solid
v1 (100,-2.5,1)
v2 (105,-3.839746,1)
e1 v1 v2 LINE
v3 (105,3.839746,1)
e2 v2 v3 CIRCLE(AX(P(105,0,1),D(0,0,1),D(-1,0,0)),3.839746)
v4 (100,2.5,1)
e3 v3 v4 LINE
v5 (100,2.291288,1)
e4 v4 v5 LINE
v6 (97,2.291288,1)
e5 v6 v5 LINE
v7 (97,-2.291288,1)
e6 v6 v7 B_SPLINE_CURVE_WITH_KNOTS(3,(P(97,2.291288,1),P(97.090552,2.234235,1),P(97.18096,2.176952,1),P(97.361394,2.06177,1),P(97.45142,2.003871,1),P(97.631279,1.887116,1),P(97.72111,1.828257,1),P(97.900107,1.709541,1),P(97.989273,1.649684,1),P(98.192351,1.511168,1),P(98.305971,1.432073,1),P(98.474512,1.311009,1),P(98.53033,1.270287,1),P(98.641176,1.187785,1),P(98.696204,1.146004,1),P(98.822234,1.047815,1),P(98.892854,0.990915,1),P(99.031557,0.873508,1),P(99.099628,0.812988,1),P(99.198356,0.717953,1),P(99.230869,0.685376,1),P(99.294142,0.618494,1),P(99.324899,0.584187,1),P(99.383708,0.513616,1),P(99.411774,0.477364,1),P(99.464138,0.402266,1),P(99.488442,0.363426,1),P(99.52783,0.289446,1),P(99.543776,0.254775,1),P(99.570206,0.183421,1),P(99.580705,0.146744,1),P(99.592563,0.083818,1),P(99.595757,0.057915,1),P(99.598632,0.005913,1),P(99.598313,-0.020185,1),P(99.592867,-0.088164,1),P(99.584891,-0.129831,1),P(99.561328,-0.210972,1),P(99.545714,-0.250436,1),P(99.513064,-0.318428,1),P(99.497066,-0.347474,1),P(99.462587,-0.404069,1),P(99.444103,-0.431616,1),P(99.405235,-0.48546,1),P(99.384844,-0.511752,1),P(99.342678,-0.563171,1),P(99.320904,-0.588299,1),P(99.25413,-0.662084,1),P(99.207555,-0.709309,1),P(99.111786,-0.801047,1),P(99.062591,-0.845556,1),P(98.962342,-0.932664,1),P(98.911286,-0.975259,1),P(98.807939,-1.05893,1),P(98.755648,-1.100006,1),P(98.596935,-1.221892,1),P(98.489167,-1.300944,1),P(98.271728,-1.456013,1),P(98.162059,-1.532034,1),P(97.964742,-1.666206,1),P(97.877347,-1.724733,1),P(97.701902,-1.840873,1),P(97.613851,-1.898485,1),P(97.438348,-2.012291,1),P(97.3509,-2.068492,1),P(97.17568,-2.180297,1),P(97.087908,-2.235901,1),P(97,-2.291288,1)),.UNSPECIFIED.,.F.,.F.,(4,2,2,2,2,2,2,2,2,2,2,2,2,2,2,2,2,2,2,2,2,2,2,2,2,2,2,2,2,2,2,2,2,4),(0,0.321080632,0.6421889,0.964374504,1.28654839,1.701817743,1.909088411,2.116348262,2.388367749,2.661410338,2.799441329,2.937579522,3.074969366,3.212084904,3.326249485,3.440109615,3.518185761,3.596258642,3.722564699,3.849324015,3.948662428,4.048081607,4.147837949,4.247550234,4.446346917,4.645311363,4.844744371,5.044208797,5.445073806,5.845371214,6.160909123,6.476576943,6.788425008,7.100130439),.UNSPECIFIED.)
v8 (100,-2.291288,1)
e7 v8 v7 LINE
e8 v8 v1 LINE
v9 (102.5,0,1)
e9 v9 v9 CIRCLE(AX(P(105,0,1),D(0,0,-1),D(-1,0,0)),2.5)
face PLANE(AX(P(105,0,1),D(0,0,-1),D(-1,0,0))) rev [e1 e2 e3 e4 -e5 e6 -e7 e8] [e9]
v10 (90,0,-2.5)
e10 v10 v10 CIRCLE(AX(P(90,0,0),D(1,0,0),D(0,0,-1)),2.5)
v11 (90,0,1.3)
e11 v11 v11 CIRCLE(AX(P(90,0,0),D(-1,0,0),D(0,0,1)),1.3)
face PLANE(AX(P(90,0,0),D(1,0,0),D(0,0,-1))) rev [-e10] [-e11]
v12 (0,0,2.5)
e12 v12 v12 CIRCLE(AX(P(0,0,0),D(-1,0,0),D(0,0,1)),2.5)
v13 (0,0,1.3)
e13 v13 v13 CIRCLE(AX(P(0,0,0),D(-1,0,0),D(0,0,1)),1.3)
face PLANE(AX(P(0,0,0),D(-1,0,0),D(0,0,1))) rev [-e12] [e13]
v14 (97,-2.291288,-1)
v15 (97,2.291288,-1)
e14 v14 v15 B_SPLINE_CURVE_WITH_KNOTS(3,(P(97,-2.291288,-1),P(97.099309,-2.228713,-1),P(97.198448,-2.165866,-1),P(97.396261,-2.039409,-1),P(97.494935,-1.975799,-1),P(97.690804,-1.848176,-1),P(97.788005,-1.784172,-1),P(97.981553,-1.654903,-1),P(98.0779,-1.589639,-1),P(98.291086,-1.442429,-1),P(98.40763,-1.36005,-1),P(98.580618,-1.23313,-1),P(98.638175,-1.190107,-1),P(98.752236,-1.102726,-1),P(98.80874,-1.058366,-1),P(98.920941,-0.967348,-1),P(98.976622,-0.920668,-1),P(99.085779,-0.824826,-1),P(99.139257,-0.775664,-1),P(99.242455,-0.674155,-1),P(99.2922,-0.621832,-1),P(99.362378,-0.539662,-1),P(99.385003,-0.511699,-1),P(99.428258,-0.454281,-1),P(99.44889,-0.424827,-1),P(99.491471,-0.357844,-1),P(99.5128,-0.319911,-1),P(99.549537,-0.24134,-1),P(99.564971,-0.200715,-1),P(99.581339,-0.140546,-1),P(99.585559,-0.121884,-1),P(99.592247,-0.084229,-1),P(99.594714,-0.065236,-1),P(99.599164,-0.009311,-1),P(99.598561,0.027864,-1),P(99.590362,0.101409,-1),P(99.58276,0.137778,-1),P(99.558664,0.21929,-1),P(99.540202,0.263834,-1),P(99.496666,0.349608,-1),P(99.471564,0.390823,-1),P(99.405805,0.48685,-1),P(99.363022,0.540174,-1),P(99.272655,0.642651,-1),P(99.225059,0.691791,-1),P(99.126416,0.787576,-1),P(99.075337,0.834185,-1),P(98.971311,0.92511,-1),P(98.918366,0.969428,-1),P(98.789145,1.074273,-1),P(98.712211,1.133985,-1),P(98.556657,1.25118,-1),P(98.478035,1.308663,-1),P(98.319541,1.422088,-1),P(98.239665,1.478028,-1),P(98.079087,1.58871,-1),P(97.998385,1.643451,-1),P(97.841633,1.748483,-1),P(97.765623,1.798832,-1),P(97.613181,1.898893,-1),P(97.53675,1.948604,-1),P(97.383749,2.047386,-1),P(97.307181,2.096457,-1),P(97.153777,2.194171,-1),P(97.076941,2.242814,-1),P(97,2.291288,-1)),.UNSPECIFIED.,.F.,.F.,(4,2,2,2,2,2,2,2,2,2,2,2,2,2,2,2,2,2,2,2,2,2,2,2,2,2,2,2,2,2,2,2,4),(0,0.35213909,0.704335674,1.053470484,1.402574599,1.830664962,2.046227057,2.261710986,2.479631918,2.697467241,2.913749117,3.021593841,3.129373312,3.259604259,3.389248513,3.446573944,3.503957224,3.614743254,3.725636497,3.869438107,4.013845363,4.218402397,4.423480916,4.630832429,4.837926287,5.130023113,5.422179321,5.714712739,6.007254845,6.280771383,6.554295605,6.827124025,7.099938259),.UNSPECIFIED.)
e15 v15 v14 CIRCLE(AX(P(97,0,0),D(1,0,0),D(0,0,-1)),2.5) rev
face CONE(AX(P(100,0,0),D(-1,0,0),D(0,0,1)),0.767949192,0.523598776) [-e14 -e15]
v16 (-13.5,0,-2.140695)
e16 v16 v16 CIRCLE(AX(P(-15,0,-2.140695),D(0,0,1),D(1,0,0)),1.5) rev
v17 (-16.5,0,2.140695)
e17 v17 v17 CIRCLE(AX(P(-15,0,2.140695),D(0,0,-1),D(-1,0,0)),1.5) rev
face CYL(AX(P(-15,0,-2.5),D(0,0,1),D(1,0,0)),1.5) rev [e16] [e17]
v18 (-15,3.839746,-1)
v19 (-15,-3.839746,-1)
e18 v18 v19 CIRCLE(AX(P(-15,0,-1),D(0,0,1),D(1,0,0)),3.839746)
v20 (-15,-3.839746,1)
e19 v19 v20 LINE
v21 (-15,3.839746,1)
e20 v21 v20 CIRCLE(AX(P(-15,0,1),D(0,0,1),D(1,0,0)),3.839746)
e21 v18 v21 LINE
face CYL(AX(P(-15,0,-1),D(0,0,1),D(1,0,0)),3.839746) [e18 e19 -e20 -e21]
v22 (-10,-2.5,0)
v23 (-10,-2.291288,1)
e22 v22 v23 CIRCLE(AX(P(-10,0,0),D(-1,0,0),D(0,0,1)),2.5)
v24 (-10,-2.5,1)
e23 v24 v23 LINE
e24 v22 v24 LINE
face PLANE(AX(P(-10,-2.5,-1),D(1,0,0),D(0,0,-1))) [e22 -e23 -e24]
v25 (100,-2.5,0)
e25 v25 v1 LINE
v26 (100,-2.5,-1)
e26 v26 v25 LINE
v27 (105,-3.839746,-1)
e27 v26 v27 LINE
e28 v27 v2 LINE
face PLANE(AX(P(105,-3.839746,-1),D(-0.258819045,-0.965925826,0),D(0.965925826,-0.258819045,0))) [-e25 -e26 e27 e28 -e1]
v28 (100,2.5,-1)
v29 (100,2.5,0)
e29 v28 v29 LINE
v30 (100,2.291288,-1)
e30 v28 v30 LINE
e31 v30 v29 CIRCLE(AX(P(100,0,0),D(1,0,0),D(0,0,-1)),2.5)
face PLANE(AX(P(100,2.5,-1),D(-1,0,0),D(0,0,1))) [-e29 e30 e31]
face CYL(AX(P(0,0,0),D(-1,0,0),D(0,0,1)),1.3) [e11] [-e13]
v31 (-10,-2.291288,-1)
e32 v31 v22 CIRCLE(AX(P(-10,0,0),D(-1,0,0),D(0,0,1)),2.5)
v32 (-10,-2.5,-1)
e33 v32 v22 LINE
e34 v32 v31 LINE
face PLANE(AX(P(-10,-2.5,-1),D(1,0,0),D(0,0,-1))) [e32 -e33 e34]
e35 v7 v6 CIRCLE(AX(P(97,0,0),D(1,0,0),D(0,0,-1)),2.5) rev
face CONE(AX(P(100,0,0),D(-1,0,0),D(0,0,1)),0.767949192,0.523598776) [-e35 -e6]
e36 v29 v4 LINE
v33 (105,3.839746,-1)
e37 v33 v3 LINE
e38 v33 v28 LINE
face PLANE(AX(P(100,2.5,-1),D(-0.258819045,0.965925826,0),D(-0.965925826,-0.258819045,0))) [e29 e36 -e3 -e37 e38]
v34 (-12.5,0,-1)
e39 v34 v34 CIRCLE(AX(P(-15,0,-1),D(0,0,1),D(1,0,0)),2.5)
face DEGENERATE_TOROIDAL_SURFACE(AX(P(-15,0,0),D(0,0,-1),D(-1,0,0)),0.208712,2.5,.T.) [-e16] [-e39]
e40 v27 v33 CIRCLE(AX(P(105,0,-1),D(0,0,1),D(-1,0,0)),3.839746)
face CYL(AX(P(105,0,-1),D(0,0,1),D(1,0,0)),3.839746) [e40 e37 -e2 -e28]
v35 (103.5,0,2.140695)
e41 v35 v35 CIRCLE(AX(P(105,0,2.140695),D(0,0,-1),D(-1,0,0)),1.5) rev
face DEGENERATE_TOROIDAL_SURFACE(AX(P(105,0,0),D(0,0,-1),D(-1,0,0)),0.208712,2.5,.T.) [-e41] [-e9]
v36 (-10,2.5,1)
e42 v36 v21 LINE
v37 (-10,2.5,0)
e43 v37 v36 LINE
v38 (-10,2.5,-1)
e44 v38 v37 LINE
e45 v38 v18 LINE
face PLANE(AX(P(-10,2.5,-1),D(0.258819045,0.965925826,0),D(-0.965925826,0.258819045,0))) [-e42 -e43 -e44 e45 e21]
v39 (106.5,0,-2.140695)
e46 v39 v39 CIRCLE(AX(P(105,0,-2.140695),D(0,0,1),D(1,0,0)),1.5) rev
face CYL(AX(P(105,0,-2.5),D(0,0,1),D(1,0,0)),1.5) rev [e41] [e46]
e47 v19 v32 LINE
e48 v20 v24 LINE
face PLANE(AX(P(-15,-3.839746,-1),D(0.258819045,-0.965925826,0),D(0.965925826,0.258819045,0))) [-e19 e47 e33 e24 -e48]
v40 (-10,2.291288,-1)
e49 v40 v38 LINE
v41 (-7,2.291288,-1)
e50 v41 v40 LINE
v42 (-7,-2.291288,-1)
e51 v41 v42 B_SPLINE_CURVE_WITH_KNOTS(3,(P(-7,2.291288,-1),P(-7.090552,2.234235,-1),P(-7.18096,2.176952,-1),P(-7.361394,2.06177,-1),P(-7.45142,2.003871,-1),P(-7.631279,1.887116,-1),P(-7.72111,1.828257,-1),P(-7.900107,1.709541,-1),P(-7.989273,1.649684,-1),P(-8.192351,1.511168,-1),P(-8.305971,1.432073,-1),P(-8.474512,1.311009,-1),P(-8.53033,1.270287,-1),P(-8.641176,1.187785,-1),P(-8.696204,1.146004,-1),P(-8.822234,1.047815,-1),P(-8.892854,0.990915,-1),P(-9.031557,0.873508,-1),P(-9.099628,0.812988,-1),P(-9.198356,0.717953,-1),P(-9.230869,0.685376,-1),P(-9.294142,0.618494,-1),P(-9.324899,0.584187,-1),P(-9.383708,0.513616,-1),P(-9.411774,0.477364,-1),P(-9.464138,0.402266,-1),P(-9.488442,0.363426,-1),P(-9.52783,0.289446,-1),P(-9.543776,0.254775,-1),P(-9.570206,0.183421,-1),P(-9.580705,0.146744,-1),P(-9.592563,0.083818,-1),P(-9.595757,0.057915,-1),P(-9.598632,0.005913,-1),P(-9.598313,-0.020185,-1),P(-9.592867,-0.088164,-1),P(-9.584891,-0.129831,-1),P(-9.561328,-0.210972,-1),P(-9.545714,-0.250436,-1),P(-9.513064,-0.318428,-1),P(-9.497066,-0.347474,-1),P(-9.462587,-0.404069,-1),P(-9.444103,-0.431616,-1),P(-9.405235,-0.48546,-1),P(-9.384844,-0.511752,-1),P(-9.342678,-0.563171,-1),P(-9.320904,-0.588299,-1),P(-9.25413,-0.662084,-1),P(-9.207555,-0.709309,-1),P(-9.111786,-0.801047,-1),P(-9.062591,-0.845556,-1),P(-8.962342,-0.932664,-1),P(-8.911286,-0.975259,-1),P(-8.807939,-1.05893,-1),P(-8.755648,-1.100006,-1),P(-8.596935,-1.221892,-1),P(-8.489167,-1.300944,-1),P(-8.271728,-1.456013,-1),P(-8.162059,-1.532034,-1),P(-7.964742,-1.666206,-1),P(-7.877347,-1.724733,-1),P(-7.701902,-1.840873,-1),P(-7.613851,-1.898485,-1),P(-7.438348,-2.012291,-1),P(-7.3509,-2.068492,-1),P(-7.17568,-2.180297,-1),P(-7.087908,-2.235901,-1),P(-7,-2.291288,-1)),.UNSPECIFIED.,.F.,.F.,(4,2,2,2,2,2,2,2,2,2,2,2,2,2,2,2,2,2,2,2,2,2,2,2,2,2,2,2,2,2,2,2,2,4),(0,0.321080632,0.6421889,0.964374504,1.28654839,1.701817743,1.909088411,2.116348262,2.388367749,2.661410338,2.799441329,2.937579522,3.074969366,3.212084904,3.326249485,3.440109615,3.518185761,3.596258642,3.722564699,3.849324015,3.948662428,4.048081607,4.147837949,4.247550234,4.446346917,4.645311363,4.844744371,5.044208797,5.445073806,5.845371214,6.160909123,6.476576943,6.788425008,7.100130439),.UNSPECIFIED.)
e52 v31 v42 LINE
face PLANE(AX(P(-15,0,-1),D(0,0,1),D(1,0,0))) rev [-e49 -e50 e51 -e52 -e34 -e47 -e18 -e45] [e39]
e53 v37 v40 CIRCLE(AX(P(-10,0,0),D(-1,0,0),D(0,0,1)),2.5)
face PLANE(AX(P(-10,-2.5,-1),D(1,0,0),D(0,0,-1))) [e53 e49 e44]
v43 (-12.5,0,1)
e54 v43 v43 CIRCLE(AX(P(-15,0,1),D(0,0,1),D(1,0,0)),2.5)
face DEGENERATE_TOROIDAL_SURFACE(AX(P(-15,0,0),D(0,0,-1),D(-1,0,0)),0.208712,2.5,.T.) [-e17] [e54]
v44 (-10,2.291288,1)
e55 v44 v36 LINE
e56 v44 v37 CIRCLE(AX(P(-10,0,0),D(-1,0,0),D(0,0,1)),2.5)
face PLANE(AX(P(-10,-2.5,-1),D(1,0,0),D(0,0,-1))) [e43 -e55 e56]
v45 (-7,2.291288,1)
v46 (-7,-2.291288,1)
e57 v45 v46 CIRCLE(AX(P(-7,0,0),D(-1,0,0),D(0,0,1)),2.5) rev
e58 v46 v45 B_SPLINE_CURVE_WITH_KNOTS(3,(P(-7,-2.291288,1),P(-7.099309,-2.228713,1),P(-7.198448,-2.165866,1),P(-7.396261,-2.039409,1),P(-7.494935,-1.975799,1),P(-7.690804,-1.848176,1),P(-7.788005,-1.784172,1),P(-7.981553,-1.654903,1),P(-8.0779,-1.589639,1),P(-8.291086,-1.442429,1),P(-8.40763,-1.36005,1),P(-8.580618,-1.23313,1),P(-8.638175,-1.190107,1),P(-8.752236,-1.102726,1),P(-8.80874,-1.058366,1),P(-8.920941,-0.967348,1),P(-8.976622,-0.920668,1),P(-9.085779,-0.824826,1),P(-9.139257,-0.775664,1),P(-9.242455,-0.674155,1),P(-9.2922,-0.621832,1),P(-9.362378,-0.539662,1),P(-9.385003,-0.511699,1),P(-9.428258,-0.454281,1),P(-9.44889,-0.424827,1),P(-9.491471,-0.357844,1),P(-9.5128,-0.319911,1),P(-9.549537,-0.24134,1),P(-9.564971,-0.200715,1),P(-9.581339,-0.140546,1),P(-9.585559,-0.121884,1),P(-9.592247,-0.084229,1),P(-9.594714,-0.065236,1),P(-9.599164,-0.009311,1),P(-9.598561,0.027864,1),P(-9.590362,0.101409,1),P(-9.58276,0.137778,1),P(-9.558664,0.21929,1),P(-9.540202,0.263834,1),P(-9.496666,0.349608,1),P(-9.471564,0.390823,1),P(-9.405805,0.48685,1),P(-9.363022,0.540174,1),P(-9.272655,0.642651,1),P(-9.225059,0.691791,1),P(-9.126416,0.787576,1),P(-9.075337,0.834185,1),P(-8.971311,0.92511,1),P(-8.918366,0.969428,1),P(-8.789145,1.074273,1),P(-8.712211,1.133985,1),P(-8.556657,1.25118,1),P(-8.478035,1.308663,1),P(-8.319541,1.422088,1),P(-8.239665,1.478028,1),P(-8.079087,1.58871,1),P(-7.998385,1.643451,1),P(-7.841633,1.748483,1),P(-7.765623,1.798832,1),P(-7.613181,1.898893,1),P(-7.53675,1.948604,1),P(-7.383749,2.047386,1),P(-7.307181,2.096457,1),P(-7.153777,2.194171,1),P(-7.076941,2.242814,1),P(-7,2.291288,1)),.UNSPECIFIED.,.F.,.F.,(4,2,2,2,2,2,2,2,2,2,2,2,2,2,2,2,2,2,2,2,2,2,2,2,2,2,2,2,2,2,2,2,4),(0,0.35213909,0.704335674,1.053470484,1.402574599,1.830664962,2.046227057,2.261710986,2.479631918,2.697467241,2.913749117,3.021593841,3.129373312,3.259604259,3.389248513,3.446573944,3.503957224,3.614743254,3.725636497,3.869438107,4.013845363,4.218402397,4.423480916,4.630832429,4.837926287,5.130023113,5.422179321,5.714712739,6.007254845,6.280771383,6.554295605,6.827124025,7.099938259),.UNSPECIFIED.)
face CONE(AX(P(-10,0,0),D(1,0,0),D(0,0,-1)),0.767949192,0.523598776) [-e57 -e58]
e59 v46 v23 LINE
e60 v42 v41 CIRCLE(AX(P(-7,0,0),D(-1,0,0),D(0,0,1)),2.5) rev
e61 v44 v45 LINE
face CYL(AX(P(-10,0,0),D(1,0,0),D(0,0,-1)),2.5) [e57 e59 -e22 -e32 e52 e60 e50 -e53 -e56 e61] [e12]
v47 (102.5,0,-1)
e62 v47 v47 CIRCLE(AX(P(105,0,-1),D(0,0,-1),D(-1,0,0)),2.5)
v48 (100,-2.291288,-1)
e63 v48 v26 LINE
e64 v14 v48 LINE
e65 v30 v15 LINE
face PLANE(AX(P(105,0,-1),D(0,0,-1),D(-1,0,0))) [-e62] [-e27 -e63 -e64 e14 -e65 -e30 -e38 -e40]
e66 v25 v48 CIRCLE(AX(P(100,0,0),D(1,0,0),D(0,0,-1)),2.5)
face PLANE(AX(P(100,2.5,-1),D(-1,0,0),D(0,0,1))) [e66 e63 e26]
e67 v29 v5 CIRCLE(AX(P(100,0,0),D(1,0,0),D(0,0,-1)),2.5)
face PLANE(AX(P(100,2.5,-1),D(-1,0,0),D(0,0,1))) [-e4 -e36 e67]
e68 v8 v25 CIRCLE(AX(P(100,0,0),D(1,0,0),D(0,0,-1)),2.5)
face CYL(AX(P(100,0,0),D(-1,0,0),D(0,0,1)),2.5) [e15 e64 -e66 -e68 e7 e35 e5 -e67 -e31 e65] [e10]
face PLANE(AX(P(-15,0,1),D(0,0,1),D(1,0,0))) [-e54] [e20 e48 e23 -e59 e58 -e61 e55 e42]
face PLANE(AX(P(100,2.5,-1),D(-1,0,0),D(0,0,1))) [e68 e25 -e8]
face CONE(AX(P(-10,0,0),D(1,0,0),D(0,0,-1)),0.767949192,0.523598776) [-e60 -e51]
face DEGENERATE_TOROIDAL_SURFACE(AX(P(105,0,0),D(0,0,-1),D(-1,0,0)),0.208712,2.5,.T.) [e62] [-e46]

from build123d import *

# Parameters (mm, degrees)
SKETCH_1_W               = 90
SKETCH_1_H               = 1.3
SKETCH_2_R               = 2.5
EXTRUDE_1_DEPTH          = 10
EXTRUDE_START            = 10
SKETCH_3_R               = 2.5
EXTRUDE_2_DEPTH          = 10
EXTRUDE_3_DEPTH          = 1
EXTRUDE_3_DEPTH_BACK     = 1
SKETCH_4_R               = 1.55
EXTRUDE_4_DEPTH          = 2.5
EXTRUDE_4_DEPTH_BACK     = 2.5
SKETCH_5_R               = 2.5
CHAMFER_1_SIZE           = 3
CHAMFER_1_SIZE_2         = 1.732050808
FILLET_1_R               = 2.5
CUT_EXTRUDE_1_DEPTH      = 109.936146208
CUT_EXTRUDE_1_DEPTH_BACK = 109.936146208
SKETCH_6_R               = 1.5


with BuildPart() as part:
    # 草图1 → 旋转1 (revolve)
    with BuildSketch(Plane.XY, mode=Mode.PRIVATE) as revolve_1_sk:
        with Locations((45, 0.65)):
            Rectangle(SKETCH_1_W, SKETCH_1_H)
    revolve(revolve_1_sk.sketch.rotate(Axis((0, 0, 0), (1, 0, 0)), 90), axis=Axis((0, 0, 0), (1, 0, 0)))

    # 草图2 → 凸台-拉伸1 (add)
    with BuildSketch(Plane(origin=(90, 0, 0), x_dir=(0, 0, -1), z_dir=(1, 0, 0))):
        Circle(SKETCH_2_R)
    extrude(amount=EXTRUDE_1_DEPTH)

    # 草图3 → 凸台-拉伸2 (add)
    with BuildSketch(Plane.ZY.offset(EXTRUDE_START)):
        with Locations(Location((0, 0, 0), (0, 0, 180))):
            Circle(SKETCH_3_R)
    extrude(amount=-EXTRUDE_2_DEPTH)

    # 草图4 → 凸台-拉伸3 (add, two sides: drawn at the far end of the back side and taken through both)
    # profile 1 of 2: a face of its own
    with BuildSketch(Plane.XY.offset(-EXTRUDE_3_DEPTH_BACK)):
        with BuildLine():
            Line((100, 2.5), (100, -2.5))
            Line((100, -2.5), (105, -3.839745962))
            ThreePointArc((105, -3.839745962), (108.839745962, 0), (105, 3.839745962))
            Line((105, 3.839745962), (100, 2.5))
        make_face()
        with Locations((105, 0)):
            Circle(SKETCH_4_R, mode=Mode.SUBTRACT)
    # profile 2 of 2: a face of its own
    with BuildSketch(Plane.XY.offset(-EXTRUDE_3_DEPTH_BACK)):
        with BuildLine():
            Line((-10, 2.5), (-15, 3.839745962))
            ThreePointArc((-15, 3.839745962), (-18.839745962, 0), (-15, -3.839745962))
            Line((-15, -3.839745962), (-10, -2.5))
            Line((-10, -2.5), (-10, 2.5))
        make_face()
        with Locations((-15, 0)):
            Circle(SKETCH_4_R, mode=Mode.SUBTRACT)
    extrude(amount=EXTRUDE_3_DEPTH + EXTRUDE_3_DEPTH_BACK)

    # 草图5 → 凸台-拉伸4 (add, two sides: drawn at the far end of the back side and taken through both)
    with BuildSketch(Plane.XY.offset(-EXTRUDE_4_DEPTH_BACK)):
        with Locations((105, 0)):
            Circle(SKETCH_5_R)
        with Locations((-15, 0)):
            Circle(SKETCH_5_R)
    extrude(amount=EXTRUDE_4_DEPTH + EXTRUDE_4_DEPTH_BACK)

    # 倒角1
    # the kernel refuses this chamfer: 3, 1.732050808 mm, written as the material it takes off along each edge
    with BuildSketch(Plane(origin=(100, 0, 0), x_dir=(0, 0, -1), z_dir=(0, -1, 0))) as chamfer_1_piece_1_section:
        Polygon((2.5, -CHAMFER_1_SIZE), (2.5 - CHAMFER_1_SIZE_2, 0), (2.5, 0), align=None)
    chamfer_1_piece_1 = revolve(axis=Axis((100, 0, 0), (1, 0, 0)), revolution_arc=244.335649535, mode=Mode.PRIVATE)
    chamfer_1_piece_1 = split(chamfer_1_piece_1, bisect_by=Plane(origin=(98.91025403, 0.96255065, -1), z_dir=(0, 0, -1)), keep=Keep.TOP, mode=Mode.PRIVATE)
    add(chamfer_1_piece_1, mode=Mode.SUBTRACT)
    with BuildSketch(Plane(origin=(100, 0, 0), x_dir=(0, 0, -1), z_dir=(0, -1, 0))) as chamfer_1_piece_2_section:
        Polygon((2.5, -CHAMFER_1_SIZE), (2.5 - CHAMFER_1_SIZE_2, 0), (2.5, 0), align=None)
    chamfer_1_piece_2 = revolve(axis=Axis((100, 0, 0), (1, 0, 0)), revolution_arc=244.335649535, mode=Mode.PRIVATE)
    chamfer_1_piece_2 = split(chamfer_1_piece_2, bisect_by=Plane(origin=(98.892055311, -0.028025322, 1), z_dir=(0, 0, 1)), keep=Keep.TOP, mode=Mode.PRIVATE)
    add(chamfer_1_piece_2, mode=Mode.SUBTRACT)
    with BuildSketch(Plane(origin=(100, 0, 0), x_dir=(0, 0.003141587485879368, -0.9999950652018581), z_dir=(0, -0.9999950652018581, -0.003141587485879368))) as chamfer_1_piece_3_section:
        Polygon((2.5, -CHAMFER_1_SIZE), (2.5 - CHAMFER_1_SIZE_2, 0), (2.5, 0), align=None)
    chamfer_1_piece_3 = revolve(axis=Axis((100, 0, 0), (1, 0, 0)), revolution_arc=359.64, mode=Mode.PRIVATE)
    chamfer_1_piece_3 = split(chamfer_1_piece_3, bisect_by=Plane(origin=(98.910233235, 0.965609903, -1), z_dir=(0, 0, -1)), keep=Keep.TOP, mode=Mode.PRIVATE)
    add(chamfer_1_piece_3, mode=Mode.SUBTRACT)
    with BuildSketch(Plane(origin=(100, 0, 0), x_dir=(0, 0.003141587485879368, -0.9999950652018581), z_dir=(0, -0.9999950652018581, -0.003141587485879368))) as chamfer_1_piece_4_section:
        Polygon((2.5, -CHAMFER_1_SIZE), (2.5 - CHAMFER_1_SIZE_2, 0), (2.5, 0), align=None)
    chamfer_1_piece_4 = revolve(axis=Axis((100, 0, 0), (1, 0, 0)), revolution_arc=359.64, mode=Mode.PRIVATE)
    chamfer_1_piece_4 = split(chamfer_1_piece_4, bisect_by=Plane(origin=(98.91025403, -2e-09, 1), z_dir=(0, 0, 1)), keep=Keep.TOP, mode=Mode.PRIVATE)
    add(chamfer_1_piece_4, mode=Mode.SUBTRACT)
    with BuildSketch(Plane(origin=(-10, 0, 0), x_dir=(0, 0, -1), z_dir=(0, 1, 0))) as chamfer_1_piece_5_section:
        Polygon((2.5, -CHAMFER_1_SIZE), (2.5 - CHAMFER_1_SIZE_2, 0), (2.5, 0), align=None)
    chamfer_1_piece_5 = revolve(axis=Axis((-10, 0, 0), (-1, 0, 0)), revolution_arc=244.335649535, mode=Mode.PRIVATE)
    chamfer_1_piece_5 = split(chamfer_1_piece_5, bisect_by=Plane(origin=(-8.91025403, -0.96255065, -1), z_dir=(0, 0, -1)), keep=Keep.TOP, mode=Mode.PRIVATE)
    add(chamfer_1_piece_5, mode=Mode.SUBTRACT)
    with BuildSketch(Plane(origin=(-10, 0, 0), x_dir=(0, 0, -1), z_dir=(0, 1, 0))) as chamfer_1_piece_6_section:
        Polygon((2.5, -CHAMFER_1_SIZE), (2.5 - CHAMFER_1_SIZE_2, 0), (2.5, 0), align=None)
    chamfer_1_piece_6 = revolve(axis=Axis((-10, 0, 0), (-1, 0, 0)), revolution_arc=244.335649535, mode=Mode.PRIVATE)
    chamfer_1_piece_6 = split(chamfer_1_piece_6, bisect_by=Plane(origin=(-8.892055311, 0.028025322, 1), z_dir=(0, 0, 1)), keep=Keep.TOP, mode=Mode.PRIVATE)
    add(chamfer_1_piece_6, mode=Mode.SUBTRACT)
    with BuildSketch(Plane(origin=(-10, 0, 0), x_dir=(0, -0.0031415874858794677, -0.9999950652018581), z_dir=(0, 0.9999950652018581, -0.0031415874858794677))) as chamfer_1_piece_7_section:
        Polygon((2.5, -CHAMFER_1_SIZE), (2.5 - CHAMFER_1_SIZE_2, 0), (2.5, 0), align=None)
    chamfer_1_piece_7 = revolve(axis=Axis((-10, 0, 0), (-1, 0, 0)), revolution_arc=359.64, mode=Mode.PRIVATE)
    chamfer_1_piece_7 = split(chamfer_1_piece_7, bisect_by=Plane(origin=(-8.910233235, -0.965609903, -1), z_dir=(0, 0, -1)), keep=Keep.TOP, mode=Mode.PRIVATE)
    add(chamfer_1_piece_7, mode=Mode.SUBTRACT)
    with BuildSketch(Plane(origin=(-10, 0, 0), x_dir=(0, -0.0031415874858794677, -0.9999950652018581), z_dir=(0, 0.9999950652018581, -0.0031415874858794677))) as chamfer_1_piece_8_section:
        Polygon((2.5, -CHAMFER_1_SIZE), (2.5 - CHAMFER_1_SIZE_2, 0), (2.5, 0), align=None)
    chamfer_1_piece_8 = revolve(axis=Axis((-10, 0, 0), (-1, 0, 0)), revolution_arc=359.64, mode=Mode.PRIVATE)
    chamfer_1_piece_8 = split(chamfer_1_piece_8, bisect_by=Plane(origin=(-8.91025403, 2e-09, 1), z_dir=(0, 0, 1)), keep=Keep.TOP, mode=Mode.PRIVATE)
    add(chamfer_1_piece_8, mode=Mode.SUBTRACT)
    with BuildSketch(Plane(origin=(-10, 0, 0), x_dir=(0, -0.901346670332976, 0.43309834896898114), z_dir=(0, -0.43309834896898114, -0.901346670332976))) as chamfer_1_piece_9_section:
        Polygon((2.5, -CHAMFER_1_SIZE), (2.5 - CHAMFER_1_SIZE_2, 0), (2.5, 0), align=None)
    chamfer_1_piece_9 = revolve(axis=Axis((-10, 0, 0), (-1, 0, 0)), revolution_arc=244.335649535, mode=Mode.PRIVATE)
    chamfer_1_piece_9 = split(chamfer_1_piece_9, bisect_by=Plane(origin=(-8.89205531, -0.028025322, 1), z_dir=(0, 0, 1)), keep=Keep.TOP, mode=Mode.PRIVATE)
    add(chamfer_1_piece_9, mode=Mode.SUBTRACT)
    with BuildSketch(Plane(origin=(-10, 0, 0), x_dir=(0, -0.901346670332976, 0.43309834896898114), z_dir=(0, -0.43309834896898114, -0.901346670332976))) as chamfer_1_piece_10_section:
        Polygon((2.5, -CHAMFER_1_SIZE), (2.5 - CHAMFER_1_SIZE_2, 0), (2.5, 0), align=None)
    chamfer_1_piece_10 = revolve(axis=Axis((-10, 0, 0), (-1, 0, 0)), revolution_arc=244.335649535, mode=Mode.PRIVATE)
    chamfer_1_piece_10 = split(chamfer_1_piece_10, bisect_by=Plane(origin=(-8.910254031, 0.96255065, -1), z_dir=(0, 0, -1)), keep=Keep.TOP, mode=Mode.PRIVATE)
    add(chamfer_1_piece_10, mode=Mode.SUBTRACT)
    with BuildSketch(Plane(origin=(100, 0, 0), x_dir=(0, 0.9013466703329771, 0.43309834896897925), z_dir=(0, 0.43309834896897925, -0.9013466703329771))) as chamfer_1_piece_11_section:
        Polygon((2.5, -CHAMFER_1_SIZE), (2.5 - CHAMFER_1_SIZE_2, 0), (2.5, 0), align=None)
    chamfer_1_piece_11 = revolve(axis=Axis((100, 0, 0), (1, 0, 0)), revolution_arc=244.335649535, mode=Mode.PRIVATE)
    chamfer_1_piece_11 = split(chamfer_1_piece_11, bisect_by=Plane(origin=(98.89205531, 0.028025322, 1), z_dir=(0, 0, 1)), keep=Keep.TOP, mode=Mode.PRIVATE)
    add(chamfer_1_piece_11, mode=Mode.SUBTRACT)
    with BuildSketch(Plane(origin=(100, 0, 0), x_dir=(0, 0.9013466703329771, 0.43309834896897925), z_dir=(0, 0.43309834896897925, -0.9013466703329771))) as chamfer_1_piece_12_section:
        Polygon((2.5, -CHAMFER_1_SIZE), (2.5 - CHAMFER_1_SIZE_2, 0), (2.5, 0), align=None)
    chamfer_1_piece_12 = revolve(axis=Axis((100, 0, 0), (1, 0, 0)), revolution_arc=244.335649535, mode=Mode.PRIVATE)
    chamfer_1_piece_12 = split(chamfer_1_piece_12, bisect_by=Plane(origin=(98.910254031, -0.96255065, -1), z_dir=(0, 0, -1)), keep=Keep.TOP, mode=Mode.PRIVATE)
    add(chamfer_1_piece_12, mode=Mode.SUBTRACT)

    # 圆角1
    # the kernel refuses this fillet: 2.5 mm, written as the material it takes off along each edge
    with BuildSketch(Plane(origin=(105, 0, -2.5), x_dir=(1, 0, 0), z_dir=(0, -1, 0))) as fillet_1_piece_1:
        with BuildLine():
            CenterArc((0.208712153, 2.5), FILLET_1_R, 270, 66.421821522)
            Line((0.208712153, 0), (0.208712153, -0.05))
            Line((0.208712153, -0.05), (2.5, -0.05))
            Line((2.5, -0.05), (2.55, 0))
            ThreePointArc((2.55, 0), (2.55, 0.75), (2.545825757, 1.48))
            Line((2.545825757, 1.48), (2.5, 1.5))
        make_face()
    revolve(axis=Axis((105, 0, -2.5), (0, 0, 1)), mode=Mode.SUBTRACT)
    with BuildSketch(Plane(origin=(105, 0, 2.5), x_dir=(1, 0, 0), z_dir=(0, -1, 0))) as fillet_1_piece_2:
        with BuildLine():
            CenterArc((0.208712153, -2.5), FILLET_1_R, 23.578178478, 66.421821522)
            Line((0.208712153, 0), (0.208712153, 0.05))
            Line((0.208712153, 0.05), (2.5, 0.05))
            Line((2.5, 0.05), (2.55, 0))
            ThreePointArc((2.55, 0), (2.55, -0.75), (2.545825757, -1.48))
            Line((2.545825757, -1.48), (2.5, -1.5))
        make_face()
    revolve(axis=Axis((105, 0, 2.5), (0, 0, 1)), mode=Mode.SUBTRACT)
    with BuildSketch(Plane(origin=(-15, 0, -2.5), x_dir=(1, 0, 0), z_dir=(0, -1, 0))) as fillet_1_piece_3:
        with BuildLine():
            CenterArc((0.208712153, 2.5), FILLET_1_R, 270, 66.421821522)
            Line((0.208712153, 0), (0.208712153, -0.05))
            Line((0.208712153, -0.05), (2.5, -0.05))
            Line((2.5, -0.05), (2.55, 0))
            ThreePointArc((2.55, 0), (2.55, 0.75), (2.545825757, 1.48))
            Line((2.545825757, 1.48), (2.5, 1.5))
        make_face()
    revolve(axis=Axis((-15, 0, -2.5), (0, 0, 1)), mode=Mode.SUBTRACT)
    with BuildSketch(Plane(origin=(-15, 0, 2.5), x_dir=(1, 0, 0), z_dir=(0, -1, 0))) as fillet_1_piece_4:
        with BuildLine():
            CenterArc((0.208712153, -2.5), FILLET_1_R, 23.578178478, 66.421821522)
            Line((0.208712153, 0), (0.208712153, 0.05))
            Line((0.208712153, 0.05), (2.5, 0.05))
            Line((2.5, 0.05), (2.55, 0))
            ThreePointArc((2.55, 0), (2.55, -0.75), (2.545825757, -1.48))
            Line((2.545825757, -1.48), (2.5, -1.5))
        make_face()
    revolve(axis=Axis((-15, 0, 2.5), (0, 0, 1)), mode=Mode.SUBTRACT)

    # 草图6 → 切除-拉伸1 (cut, two sides: drawn at the far end of the back side and taken through both)
    with BuildSketch(Plane.XY.offset(-CUT_EXTRUDE_1_DEPTH_BACK)):
        with Locations((-15, 0)):
            Circle(SKETCH_6_R)
        with Locations(Location((105, 0, 0), (0, 0, 180))):
            Circle(SKETCH_6_R)
    extrude(amount=CUT_EXTRUDE_1_DEPTH + CUT_EXTRUDE_1_DEPTH_BACK, mode=Mode.SUBTRACT)


solid = part.part
